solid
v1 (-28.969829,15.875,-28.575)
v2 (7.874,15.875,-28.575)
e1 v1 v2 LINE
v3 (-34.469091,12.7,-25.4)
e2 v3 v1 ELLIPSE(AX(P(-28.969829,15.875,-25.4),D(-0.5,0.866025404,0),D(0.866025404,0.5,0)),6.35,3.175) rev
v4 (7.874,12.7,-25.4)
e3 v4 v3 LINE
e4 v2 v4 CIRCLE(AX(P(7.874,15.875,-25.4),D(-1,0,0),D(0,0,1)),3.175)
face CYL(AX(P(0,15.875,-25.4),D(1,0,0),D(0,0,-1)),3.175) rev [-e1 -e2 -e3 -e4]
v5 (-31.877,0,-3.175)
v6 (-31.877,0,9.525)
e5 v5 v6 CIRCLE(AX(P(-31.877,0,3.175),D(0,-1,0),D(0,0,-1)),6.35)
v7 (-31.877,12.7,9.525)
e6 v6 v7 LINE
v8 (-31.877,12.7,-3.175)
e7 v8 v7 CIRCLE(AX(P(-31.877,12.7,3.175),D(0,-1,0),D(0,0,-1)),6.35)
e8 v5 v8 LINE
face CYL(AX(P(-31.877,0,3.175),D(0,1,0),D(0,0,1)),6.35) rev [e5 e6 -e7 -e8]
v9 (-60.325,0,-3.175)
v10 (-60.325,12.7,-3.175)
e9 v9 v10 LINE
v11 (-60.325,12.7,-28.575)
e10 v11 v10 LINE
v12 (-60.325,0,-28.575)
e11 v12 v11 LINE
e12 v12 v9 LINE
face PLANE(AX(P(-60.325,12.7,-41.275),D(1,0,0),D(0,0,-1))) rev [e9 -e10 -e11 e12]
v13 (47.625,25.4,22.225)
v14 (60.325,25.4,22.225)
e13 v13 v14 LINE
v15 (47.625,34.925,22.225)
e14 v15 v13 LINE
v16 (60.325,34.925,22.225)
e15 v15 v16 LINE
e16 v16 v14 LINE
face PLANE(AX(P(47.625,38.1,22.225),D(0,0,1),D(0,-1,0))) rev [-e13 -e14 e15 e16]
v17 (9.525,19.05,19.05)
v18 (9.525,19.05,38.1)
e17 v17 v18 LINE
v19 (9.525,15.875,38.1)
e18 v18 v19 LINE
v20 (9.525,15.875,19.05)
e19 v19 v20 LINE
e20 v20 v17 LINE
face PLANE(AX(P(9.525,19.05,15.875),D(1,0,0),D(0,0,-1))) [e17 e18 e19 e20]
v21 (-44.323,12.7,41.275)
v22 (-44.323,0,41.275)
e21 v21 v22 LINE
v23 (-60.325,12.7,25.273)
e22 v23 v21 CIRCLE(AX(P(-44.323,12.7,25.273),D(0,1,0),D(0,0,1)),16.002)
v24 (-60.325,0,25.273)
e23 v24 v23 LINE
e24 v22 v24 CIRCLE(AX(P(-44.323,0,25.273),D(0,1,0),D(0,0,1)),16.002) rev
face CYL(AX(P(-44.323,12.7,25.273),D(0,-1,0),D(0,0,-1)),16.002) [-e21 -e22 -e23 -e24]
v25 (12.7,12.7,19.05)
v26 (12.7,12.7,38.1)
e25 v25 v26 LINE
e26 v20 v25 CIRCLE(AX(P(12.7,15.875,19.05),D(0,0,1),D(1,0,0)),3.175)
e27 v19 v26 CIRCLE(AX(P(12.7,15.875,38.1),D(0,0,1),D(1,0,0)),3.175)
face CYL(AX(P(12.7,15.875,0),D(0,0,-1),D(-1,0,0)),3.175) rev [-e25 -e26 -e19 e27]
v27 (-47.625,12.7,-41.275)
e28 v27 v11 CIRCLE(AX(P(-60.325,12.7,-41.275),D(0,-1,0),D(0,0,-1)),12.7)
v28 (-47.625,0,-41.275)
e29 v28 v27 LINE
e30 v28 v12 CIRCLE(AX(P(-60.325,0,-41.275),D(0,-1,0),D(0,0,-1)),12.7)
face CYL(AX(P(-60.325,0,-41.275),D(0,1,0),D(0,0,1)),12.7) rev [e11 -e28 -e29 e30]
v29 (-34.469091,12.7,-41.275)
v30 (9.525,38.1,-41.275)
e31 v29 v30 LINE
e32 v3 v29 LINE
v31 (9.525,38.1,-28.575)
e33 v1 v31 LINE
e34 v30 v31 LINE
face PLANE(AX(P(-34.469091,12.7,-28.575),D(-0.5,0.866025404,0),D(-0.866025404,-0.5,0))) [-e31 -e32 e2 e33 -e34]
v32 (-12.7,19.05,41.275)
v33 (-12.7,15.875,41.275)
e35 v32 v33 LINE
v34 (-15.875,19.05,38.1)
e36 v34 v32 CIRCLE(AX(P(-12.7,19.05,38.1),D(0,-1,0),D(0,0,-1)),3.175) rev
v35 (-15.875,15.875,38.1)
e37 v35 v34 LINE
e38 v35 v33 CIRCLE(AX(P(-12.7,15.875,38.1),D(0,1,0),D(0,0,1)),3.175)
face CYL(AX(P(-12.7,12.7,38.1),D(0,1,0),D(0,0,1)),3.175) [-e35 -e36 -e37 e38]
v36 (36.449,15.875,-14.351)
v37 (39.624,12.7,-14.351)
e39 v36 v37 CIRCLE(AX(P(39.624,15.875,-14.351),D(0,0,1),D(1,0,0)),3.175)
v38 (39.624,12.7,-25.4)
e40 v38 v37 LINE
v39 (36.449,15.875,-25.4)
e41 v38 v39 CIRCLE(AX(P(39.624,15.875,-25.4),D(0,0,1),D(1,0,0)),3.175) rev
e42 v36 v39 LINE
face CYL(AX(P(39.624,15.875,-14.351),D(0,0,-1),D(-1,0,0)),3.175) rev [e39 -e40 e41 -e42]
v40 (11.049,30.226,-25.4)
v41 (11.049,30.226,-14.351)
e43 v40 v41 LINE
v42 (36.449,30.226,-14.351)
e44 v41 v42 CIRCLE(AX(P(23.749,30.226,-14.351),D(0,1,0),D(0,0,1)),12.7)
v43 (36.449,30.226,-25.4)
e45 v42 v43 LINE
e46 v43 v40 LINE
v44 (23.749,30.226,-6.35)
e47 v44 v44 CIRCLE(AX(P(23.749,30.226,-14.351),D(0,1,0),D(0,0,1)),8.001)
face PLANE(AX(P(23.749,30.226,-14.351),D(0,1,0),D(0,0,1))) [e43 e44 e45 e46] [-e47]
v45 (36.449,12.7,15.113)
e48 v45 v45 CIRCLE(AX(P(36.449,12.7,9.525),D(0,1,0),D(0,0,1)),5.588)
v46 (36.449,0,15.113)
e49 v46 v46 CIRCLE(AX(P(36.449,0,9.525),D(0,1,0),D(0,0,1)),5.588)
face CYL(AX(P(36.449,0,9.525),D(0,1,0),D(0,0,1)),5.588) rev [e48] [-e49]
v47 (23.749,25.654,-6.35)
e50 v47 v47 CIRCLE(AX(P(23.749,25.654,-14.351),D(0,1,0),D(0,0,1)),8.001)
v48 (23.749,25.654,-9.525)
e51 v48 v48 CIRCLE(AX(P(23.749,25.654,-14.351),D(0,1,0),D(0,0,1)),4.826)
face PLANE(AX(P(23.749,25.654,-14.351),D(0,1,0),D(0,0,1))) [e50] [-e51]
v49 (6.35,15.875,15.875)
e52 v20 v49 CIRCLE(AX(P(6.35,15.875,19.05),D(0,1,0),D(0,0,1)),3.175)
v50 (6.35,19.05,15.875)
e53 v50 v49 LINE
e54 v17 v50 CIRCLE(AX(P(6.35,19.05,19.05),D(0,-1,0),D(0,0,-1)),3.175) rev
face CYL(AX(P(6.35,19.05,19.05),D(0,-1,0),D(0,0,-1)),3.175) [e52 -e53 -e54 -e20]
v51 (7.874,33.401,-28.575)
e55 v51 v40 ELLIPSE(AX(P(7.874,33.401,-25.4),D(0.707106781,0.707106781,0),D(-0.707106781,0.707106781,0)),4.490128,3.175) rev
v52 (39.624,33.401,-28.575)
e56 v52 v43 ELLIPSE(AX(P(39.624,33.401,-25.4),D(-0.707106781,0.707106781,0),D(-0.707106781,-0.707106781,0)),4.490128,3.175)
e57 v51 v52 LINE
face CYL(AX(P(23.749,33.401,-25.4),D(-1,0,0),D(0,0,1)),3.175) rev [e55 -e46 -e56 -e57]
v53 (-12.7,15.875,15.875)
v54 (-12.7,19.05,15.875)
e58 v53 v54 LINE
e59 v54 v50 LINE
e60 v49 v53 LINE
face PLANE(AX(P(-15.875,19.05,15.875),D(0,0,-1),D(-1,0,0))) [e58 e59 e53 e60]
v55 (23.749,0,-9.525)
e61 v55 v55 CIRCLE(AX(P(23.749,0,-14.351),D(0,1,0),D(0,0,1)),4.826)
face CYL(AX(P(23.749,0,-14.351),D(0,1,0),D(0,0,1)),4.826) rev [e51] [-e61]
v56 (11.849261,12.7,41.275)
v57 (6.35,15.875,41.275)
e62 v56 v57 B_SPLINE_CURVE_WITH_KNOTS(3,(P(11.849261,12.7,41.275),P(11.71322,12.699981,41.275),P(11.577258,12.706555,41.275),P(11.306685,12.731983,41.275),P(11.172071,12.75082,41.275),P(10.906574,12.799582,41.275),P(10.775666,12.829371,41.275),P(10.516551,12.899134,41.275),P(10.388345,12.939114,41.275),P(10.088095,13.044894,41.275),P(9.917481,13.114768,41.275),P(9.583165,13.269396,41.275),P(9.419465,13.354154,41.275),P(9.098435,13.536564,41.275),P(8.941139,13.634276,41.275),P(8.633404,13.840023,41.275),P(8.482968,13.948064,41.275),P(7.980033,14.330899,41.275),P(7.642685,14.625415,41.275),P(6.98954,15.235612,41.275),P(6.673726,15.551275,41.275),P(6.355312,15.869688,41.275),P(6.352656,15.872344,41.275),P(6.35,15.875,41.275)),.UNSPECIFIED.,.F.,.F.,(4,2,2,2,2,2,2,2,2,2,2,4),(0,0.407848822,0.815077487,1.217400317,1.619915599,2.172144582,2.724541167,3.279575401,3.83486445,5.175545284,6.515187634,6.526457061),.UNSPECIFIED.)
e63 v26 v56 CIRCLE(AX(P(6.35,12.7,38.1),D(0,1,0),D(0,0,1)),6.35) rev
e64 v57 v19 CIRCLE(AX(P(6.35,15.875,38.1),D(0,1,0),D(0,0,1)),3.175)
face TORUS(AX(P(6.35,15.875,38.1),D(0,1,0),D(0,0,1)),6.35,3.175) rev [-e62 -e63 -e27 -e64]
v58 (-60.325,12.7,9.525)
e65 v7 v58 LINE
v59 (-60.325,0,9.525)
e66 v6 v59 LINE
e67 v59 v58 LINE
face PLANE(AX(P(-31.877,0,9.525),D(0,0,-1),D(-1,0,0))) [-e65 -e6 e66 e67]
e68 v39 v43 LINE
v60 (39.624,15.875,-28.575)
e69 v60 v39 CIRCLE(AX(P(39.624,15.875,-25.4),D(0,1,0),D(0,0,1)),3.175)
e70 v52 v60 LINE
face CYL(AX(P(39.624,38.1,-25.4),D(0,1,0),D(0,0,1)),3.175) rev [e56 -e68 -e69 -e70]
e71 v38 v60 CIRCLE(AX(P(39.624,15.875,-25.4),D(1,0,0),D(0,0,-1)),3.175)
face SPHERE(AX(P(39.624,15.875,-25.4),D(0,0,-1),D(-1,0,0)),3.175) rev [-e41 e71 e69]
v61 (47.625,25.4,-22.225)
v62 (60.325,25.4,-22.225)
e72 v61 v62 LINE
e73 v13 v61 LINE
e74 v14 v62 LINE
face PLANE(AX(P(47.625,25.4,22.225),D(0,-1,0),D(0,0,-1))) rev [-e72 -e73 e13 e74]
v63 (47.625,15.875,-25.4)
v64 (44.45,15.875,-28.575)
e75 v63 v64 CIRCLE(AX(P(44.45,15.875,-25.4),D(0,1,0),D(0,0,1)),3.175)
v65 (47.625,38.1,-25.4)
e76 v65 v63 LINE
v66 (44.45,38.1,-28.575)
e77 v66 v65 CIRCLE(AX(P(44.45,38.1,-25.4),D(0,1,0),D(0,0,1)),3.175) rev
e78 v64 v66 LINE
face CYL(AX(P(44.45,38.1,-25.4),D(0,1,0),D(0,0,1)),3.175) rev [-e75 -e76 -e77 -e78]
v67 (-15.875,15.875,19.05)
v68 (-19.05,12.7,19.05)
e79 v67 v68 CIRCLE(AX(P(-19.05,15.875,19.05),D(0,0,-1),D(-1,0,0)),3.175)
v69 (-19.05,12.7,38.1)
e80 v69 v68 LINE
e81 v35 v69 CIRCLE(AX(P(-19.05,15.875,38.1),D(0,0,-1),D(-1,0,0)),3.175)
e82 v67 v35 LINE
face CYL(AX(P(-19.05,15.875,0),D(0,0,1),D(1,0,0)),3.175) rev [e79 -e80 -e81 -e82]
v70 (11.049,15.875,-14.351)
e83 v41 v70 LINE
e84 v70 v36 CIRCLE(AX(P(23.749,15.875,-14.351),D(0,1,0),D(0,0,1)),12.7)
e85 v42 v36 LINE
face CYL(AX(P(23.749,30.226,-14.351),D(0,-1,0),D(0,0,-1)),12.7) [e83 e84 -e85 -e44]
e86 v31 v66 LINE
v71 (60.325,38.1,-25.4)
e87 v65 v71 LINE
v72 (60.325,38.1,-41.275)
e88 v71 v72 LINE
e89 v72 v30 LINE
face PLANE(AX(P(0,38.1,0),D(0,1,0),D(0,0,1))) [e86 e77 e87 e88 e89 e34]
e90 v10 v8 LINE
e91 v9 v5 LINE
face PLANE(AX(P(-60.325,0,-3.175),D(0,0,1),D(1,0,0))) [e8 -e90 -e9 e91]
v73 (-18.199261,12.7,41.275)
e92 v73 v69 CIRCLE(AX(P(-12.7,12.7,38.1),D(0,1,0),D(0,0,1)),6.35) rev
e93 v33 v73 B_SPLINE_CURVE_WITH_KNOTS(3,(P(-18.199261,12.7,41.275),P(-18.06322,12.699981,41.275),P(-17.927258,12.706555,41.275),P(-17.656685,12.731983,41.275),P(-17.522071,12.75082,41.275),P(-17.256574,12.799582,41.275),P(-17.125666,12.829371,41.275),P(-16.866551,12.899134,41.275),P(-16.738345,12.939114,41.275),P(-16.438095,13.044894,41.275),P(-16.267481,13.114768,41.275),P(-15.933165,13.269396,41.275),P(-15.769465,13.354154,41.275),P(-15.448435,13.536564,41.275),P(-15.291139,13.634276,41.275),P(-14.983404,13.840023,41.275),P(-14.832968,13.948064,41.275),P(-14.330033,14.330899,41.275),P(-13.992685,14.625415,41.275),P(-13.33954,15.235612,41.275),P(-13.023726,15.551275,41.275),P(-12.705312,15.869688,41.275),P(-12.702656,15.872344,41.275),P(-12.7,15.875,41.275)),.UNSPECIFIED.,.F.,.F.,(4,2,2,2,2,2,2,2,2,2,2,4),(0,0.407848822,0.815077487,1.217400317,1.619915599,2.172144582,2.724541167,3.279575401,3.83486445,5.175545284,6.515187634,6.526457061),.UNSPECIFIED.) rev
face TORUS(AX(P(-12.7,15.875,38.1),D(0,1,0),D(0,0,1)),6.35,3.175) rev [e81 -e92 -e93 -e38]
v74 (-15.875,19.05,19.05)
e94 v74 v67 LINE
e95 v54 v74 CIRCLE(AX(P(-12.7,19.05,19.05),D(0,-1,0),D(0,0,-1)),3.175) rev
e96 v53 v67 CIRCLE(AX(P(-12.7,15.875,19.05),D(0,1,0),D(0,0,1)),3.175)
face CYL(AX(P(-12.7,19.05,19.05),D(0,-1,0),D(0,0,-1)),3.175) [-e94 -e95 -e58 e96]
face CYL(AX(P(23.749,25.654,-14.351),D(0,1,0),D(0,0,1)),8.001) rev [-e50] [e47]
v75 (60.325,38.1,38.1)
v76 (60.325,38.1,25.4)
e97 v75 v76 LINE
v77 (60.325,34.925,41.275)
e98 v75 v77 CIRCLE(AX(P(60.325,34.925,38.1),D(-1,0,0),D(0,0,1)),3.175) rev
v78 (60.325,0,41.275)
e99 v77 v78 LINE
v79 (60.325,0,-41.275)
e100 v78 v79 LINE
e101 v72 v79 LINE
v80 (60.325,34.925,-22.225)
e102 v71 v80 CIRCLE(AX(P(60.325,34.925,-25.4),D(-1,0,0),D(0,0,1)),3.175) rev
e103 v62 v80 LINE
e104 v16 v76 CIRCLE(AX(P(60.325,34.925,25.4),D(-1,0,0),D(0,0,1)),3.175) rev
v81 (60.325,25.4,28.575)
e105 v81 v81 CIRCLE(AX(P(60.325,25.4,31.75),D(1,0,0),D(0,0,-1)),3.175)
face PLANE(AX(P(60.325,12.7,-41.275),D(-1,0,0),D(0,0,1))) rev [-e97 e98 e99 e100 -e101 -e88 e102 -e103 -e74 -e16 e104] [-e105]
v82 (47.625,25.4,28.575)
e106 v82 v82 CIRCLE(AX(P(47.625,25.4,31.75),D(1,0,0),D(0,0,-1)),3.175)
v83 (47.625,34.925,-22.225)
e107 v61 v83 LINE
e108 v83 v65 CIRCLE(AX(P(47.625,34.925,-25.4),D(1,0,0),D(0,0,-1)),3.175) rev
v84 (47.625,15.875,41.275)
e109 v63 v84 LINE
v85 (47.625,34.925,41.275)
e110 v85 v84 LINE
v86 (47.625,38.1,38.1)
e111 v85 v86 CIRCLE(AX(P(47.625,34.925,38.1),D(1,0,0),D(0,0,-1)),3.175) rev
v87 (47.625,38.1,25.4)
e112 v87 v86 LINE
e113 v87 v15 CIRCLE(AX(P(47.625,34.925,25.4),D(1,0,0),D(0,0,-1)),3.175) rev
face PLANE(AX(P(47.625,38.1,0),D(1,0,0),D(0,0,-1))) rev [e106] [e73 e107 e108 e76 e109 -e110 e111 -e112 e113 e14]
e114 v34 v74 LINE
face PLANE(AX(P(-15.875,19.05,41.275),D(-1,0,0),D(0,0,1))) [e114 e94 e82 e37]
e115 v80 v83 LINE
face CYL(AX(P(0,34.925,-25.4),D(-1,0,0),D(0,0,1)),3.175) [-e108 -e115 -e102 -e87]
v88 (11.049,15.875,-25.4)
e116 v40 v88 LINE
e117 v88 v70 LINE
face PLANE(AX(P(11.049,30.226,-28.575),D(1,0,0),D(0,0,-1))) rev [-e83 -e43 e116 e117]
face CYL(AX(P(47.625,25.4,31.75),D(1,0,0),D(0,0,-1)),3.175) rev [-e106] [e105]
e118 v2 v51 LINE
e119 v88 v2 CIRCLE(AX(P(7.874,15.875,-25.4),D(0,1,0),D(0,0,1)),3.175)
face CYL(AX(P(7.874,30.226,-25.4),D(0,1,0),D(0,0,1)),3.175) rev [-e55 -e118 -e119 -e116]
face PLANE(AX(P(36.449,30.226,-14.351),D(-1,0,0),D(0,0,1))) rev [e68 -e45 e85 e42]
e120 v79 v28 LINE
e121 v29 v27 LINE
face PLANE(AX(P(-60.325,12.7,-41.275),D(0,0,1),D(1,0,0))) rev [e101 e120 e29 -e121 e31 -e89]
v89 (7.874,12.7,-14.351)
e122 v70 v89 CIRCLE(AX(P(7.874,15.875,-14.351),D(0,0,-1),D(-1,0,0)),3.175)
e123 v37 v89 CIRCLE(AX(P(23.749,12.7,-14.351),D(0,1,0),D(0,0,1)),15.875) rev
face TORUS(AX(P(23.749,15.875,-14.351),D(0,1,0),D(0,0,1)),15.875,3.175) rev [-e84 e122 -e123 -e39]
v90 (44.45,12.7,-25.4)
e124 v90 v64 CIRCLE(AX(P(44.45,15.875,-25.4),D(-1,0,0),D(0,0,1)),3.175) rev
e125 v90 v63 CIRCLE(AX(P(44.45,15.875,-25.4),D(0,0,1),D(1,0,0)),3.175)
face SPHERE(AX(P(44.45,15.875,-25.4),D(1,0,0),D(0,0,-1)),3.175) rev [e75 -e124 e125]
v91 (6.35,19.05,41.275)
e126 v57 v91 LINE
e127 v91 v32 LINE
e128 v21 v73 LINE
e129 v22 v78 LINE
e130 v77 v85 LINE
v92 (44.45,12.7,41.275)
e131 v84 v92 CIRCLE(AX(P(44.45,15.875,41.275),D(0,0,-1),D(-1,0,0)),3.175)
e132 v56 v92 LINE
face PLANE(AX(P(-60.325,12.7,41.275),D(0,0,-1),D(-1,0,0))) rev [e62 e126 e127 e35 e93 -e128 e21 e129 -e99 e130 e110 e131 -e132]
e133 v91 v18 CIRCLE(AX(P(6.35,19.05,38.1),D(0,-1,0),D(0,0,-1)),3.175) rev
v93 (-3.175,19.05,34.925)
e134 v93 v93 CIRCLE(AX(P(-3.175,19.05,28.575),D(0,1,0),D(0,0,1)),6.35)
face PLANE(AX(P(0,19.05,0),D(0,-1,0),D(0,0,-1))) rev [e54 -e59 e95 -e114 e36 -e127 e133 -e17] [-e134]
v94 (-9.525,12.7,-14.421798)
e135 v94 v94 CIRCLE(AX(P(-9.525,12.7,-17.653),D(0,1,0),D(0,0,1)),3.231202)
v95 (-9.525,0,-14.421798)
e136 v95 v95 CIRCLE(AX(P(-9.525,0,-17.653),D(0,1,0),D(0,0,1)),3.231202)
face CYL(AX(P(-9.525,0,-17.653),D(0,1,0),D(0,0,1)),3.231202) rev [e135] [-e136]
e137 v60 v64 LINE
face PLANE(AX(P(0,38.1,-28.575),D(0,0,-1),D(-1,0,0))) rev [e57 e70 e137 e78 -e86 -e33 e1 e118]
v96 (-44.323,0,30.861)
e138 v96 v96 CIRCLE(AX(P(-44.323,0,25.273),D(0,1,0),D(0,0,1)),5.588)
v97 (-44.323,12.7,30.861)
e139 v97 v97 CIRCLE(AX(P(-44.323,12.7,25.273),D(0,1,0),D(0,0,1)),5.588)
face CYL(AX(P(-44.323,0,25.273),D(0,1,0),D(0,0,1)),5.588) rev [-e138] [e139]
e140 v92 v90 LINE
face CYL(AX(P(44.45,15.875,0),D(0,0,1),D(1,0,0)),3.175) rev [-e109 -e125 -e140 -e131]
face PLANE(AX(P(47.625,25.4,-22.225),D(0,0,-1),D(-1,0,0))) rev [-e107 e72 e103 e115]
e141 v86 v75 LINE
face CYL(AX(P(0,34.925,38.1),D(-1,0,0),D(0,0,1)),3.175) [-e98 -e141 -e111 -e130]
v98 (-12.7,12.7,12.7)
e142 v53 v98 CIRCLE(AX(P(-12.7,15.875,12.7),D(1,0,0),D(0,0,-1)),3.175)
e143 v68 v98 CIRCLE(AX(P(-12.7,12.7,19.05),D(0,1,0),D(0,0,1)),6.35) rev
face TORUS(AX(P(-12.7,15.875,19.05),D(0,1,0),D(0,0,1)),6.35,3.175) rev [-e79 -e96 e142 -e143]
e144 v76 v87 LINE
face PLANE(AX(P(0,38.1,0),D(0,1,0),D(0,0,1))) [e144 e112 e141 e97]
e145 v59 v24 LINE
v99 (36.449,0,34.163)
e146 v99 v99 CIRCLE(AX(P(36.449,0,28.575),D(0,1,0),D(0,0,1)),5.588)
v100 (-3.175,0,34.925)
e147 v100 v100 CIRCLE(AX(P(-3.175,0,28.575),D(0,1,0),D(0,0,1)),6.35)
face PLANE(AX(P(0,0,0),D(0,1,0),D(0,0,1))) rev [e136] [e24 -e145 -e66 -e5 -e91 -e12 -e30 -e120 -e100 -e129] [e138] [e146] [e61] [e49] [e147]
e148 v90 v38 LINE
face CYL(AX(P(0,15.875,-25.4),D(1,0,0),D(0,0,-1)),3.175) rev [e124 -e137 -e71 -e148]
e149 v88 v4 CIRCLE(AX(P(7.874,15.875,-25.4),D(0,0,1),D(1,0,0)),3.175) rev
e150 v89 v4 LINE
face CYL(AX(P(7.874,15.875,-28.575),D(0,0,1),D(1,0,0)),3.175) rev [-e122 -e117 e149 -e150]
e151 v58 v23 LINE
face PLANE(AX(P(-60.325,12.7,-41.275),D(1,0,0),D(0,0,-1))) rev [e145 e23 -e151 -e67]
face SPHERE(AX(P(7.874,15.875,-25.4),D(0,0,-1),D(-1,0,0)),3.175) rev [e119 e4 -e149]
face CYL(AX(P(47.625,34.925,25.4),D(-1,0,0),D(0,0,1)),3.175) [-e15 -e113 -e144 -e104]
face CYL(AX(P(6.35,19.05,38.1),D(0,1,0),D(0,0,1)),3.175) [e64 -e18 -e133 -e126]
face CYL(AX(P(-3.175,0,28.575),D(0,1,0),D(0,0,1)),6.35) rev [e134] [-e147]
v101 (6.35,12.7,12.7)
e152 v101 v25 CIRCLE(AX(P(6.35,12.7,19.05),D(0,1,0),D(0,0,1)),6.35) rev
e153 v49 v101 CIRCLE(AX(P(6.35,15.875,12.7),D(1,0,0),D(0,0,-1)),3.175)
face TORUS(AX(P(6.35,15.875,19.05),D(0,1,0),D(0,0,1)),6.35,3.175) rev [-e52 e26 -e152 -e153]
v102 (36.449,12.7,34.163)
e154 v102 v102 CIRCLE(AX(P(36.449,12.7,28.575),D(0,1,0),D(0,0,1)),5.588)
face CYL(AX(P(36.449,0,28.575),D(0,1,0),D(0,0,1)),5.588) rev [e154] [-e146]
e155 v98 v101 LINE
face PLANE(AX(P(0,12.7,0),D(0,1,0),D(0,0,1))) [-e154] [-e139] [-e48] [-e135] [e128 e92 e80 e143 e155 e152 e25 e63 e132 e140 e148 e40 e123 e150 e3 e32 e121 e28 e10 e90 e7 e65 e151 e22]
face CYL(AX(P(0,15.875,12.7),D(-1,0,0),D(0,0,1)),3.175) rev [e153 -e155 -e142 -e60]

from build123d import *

# Parameters (mm, degrees)
SKETCH1_W           = 120.65
SKETCH1_H           = 82.55
BOSS_EXTRUDE1_DEPTH = 12.7
FILLET1_R           = 16.002
SKETCH2_R           = 5.588
SKETCH2_R_2         = 3.231202494
SKETCH2_R_3         = 6.35
CUT_EXTRUDE1_DEPTH  = 12.7
BOSS_EXTRUDE2_START = 6.35
SKETCH2_5_W         = 25.4
SKETCH2_5_H         = 25.4
SKETCH2_5_R         = 6.35
BOSS_EXTRUDE2_DEPTH = 6.35
BOSS_EXTRUDE3_DEPTH = 25.4
BOSS_EXTRUDE4_DEPTH = 17.526
BOSS_EXTRUDE5_DEPTH = 12.7
FILLET2_R           = 3.175
FILLET3_R           = 3.175
FILLET4_R           = 3.175
SKETCH5_R           = 8.001
CUT_EXTRUDE2_DEPTH  = 4.572
SKETCH6_R           = 4.826
CUT_EXTRUDE3_DEPTH  = 25.654
SKETCH7_W           = 44.45
SKETCH7_H           = 12.7
CUT_EXTRUDE4_DEPTH  = 12.7
FILLET5_R           = 3.175
FILLET6_R           = 3.175
SKETCH8_R           = 3.175
CUT_EXTRUDE5_DEPTH  = 12.7


with BuildPart() as part:
    # Sketch1 → Boss-Extrude1 (new body)
    with BuildSketch(Plane(origin=(0, 0, 0), x_dir=(1, 0, 0), z_dir=(0, 1, 0))):
        Rectangle(SKETCH1_W, SKETCH1_H)
    extrude(amount=BOSS_EXTRUDE1_DEPTH)

    # Fillet1
    fillet1_edges = [part.edges().sort_by_distance(p)[0] for p in [
        (-60.325, 6.35, 41.275),
    ]]
    fillet(fillet1_edges, radius=FILLET1_R)

    # Sketch2 → Cut-Extrude1 (cut)
    with BuildSketch(Plane(origin=(0, 12.7, 0), x_dir=(1, 0, 0), z_dir=(0, 1, 0))):
        with Locations(Location((36.449, -9.525, 0), (0, 0, 270))):
            Circle(SKETCH2_R)
        with Locations(Location((36.449, -28.575, 0), (0, 0, 270))):
            Circle(SKETCH2_R)
        with Locations(Location((-9.525, 17.653, 0), (0, 0, 270))):
            Circle(SKETCH2_R_2)
        with Locations(Location((-44.323, -25.273, 0), (0, 0, 270))):
            Circle(SKETCH2_R)
        with Locations(Location((-3.175, -28.575, 0), (0, 0, 270))):
            Circle(SKETCH2_R_3)
        with BuildLine():
            Line((-47.625, 41.275), (-60.325, 41.275))
            Line((-60.325, 41.275), (-60.325, 28.575))
            ThreePointArc((-60.325, 28.575), (-51.344743879, 32.294743879), (-47.625, 41.275))
        make_face()
        with BuildLine():
            Line((-60.325, 3.175), (-31.877, 3.175))
            ThreePointArc((-31.877, 3.175), (-25.527, -3.175), (-31.877, -9.525))
            Line((-31.877, -9.525), (-60.325, -9.525))
            Line((-60.325, -9.525), (-60.325, 3.175))
        make_face()
    extrude(amount=-CUT_EXTRUDE1_DEPTH, mode=Mode.SUBTRACT)

    # Sketch2<5> → Boss-Extrude2 (add)
    with BuildSketch(Plane(origin=(0, 12.7, 0), x_dir=(1, 0, 0), z_dir=(0, 1, 0)).offset(BOSS_EXTRUDE2_START)):
        with Locations((-3.175, -28.575)):
            Rectangle(SKETCH2_5_W, SKETCH2_5_H)
        with Locations(Location((-3.175, -28.575, 0), (0, 0, 270))):
            Circle(SKETCH2_5_R, mode=Mode.SUBTRACT)
    extrude(amount=-BOSS_EXTRUDE2_DEPTH)

    # Sketch2<6> → Boss-Extrude3 (add)
    with BuildSketch(Plane(origin=(0, 12.7, 0), x_dir=(1, 0, 0), z_dir=(0, 1, 0))):
        Polygon((60.325, -41.275), (60.325, 41.275), (9.525, 41.275), (9.525, 28.575), (47.625, 28.575), (47.625, -41.275), align=None)
    extrude(amount=BOSS_EXTRUDE3_DEPTH)

    # Sketch2<10> → Boss-Extrude4 (add)
    with BuildSketch(Plane(origin=(0, 12.7, 0), x_dir=(1, 0, 0), z_dir=(0, 1, 0))):
        with BuildLine():
            Line((11.049, 28.575), (11.049, 14.351))
            ThreePointArc((11.049, 14.351), (23.749, 1.651), (36.449, 14.351))
            Line((36.449, 14.351), (36.449, 28.575))
            Line((36.449, 28.575), (11.049, 28.575))
        make_face()
    extrude(amount=BOSS_EXTRUDE4_DEPTH)

    # Sketch4 → Boss-Extrude5 (add)
    with BuildSketch(Plane(origin=(0, 0, -41.275), x_dir=(-1, 0, 0), z_dir=(0, 0, -1))):
        Polygon((-9.525, 38.1), (-9.525, 12.7), (34.469090512, 12.7), align=None)
    extrude(amount=-BOSS_EXTRUDE5_DEPTH)

    # Fillet2
    fillet2_edges = [part.edges().sort_by_distance(p)[0] for p in [
        (42.037, 12.7, -28.575),
        (36.449, 21.463, -28.575),
        (11.049, 12.7, -21.463),
        (11.049, 21.463, -28.575),
        (23.749, 12.7, -1.651),
        (36.449, 12.7, -21.463),
        (23.749, 30.226, -28.575),
        (-11.710045256, 12.7, -28.575),
        (47.625, 12.7, 6.35),
        (47.625, 25.4, -28.575),
    ]]
    fillet(fillet2_edges, radius=FILLET2_R)

    # Fillet3
    fillet3_edges = [part.edges().sort_by_distance(p)[0] for p in [
        (9.525, 15.875, 15.875),
        (-15.875, 15.875, 15.875),
        (-15.875, 15.875, 41.275),
        (9.525, 15.875, 41.275),
    ]]
    fillet(fillet3_edges, radius=FILLET3_R)

    # Fillet4
    # the kernel refuses this fillet: 3.175 mm, written as the material it adds along each edge
    with BuildSketch(Plane(origin=(9.525, 12.7, 19.05), x_dir=(0, 1, 0), z_dir=(0, 0, 1)), Plane(origin=(-12.7, 12.7, 15.875), x_dir=(0, 1, 0), z_dir=(1, 0, 0)), Plane(origin=(-15.875, 12.7, 38.1), x_dir=(0, 1, 0), z_dir=(0, 0, -1))) as fillet4_piece_1:
        with BuildLine():
            CenterArc((FILLET4_R, -FILLET4_R), FILLET4_R, 90, 90)
            Line((0, -FILLET4_R), (0, 0))
            Line((0, 0), (FILLET4_R, 0))
        make_face()
    extrude(amount=19.05)
    with BuildSketch(Plane(origin=(6.35, 12.7, 38.1), x_dir=(-0.5976672776328281, 0, -0.8017442392976478), z_dir=(0.8017442392976478, 0, -0.5976672776328281))) as fillet4_piece_2_section:
        with BuildLine():
            CenterArc((3.175 + FILLET4_R, FILLET4_R), FILLET4_R, 180, 90)
            Line((3.175 + FILLET4_R, 0), (3.175, 0))
            Line((3.175, 0), (3.175, FILLET4_R))
        make_face()
    fillet4_piece_2 = revolve(axis=Axis((6.35, 12.7, 38.1), (0, 1, 0)), revolution_arc=233.296989237, mode=Mode.PRIVATE)
    fillet4_piece_2 = split(fillet4_piece_2, bisect_by=Plane(origin=(8.731056041, 13.689420087, 41.275), z_dir=(0, 0, -1)), keep=Keep.TOP, mode=Mode.PRIVATE)
    add(fillet4_piece_2)
    with BuildSketch(Plane(origin=(6.35, 12.7, 19.05), x_dir=(0, 0, -1), z_dir=(-1, 0, 0))) as fillet4_piece_3:
        with BuildLine():
            CenterArc((3.175 + FILLET4_R, -FILLET4_R), FILLET4_R, 90, 90)
            Line((3.175 + FILLET4_R, 0), (3.175, 0))
            Line((3.175, 0), (3.175, -FILLET4_R))
        make_face()
    revolve(axis=Axis((6.35, 12.7, 19.05), (0, -1, 0)), revolution_arc=90)
    with BuildSketch(Plane(origin=(-12.7, 12.7, 19.05), x_dir=(-1, 0, 0), z_dir=(0, 0, 1))) as fillet4_piece_4:
        with BuildLine():
            CenterArc((3.175 + FILLET4_R, -FILLET4_R), FILLET4_R, 90, 90)
            Line((3.175 + FILLET4_R, 0), (3.175, 0))
            Line((3.175, 0), (3.175, -FILLET4_R))
        make_face()
    revolve(axis=Axis((-12.7, 12.7, 19.05), (0, -1, 0)), revolution_arc=90)
    with BuildSketch(Plane(origin=(-12.7, 12.7, 38.1), x_dir=(0.5976672776328279, 0, -0.8017442392976479), z_dir=(-0.8017442392976479, 0, -0.5976672776328279))) as fillet4_piece_5_section:
        with BuildLine():
            CenterArc((3.175 + FILLET4_R, -FILLET4_R), FILLET4_R, 90, 90)
            Line((3.175, -FILLET4_R), (3.175, 0))
            Line((3.175, 0), (3.175 + FILLET4_R, 0))
        make_face()
    fillet4_piece_5 = revolve(axis=Axis((-12.7, 12.7, 38.1), (0, -1, 0)), revolution_arc=233.296989237, mode=Mode.PRIVATE)
    fillet4_piece_5 = split(fillet4_piece_5, bisect_by=Plane(origin=(-15.081056252, 13.689419911, 41.275), z_dir=(0, 0, -1)), keep=Keep.TOP, mode=Mode.PRIVATE)
    add(fillet4_piece_5)

    # Sketch5 → Cut-Extrude2 (cut)
    with BuildSketch(Plane(origin=(0, 30.226, 0), x_dir=(1, 0, 0), z_dir=(0, 1, 0))):
        with Locations(Location((23.749, 14.351, 0), (0, 0, 270))):
            Circle(SKETCH5_R)
    extrude(amount=-CUT_EXTRUDE2_DEPTH, mode=Mode.SUBTRACT)

    # Sketch6 → Cut-Extrude3 (cut)
    with BuildSketch(Plane(origin=(0, 25.654, 0), x_dir=(1, 0, 0), z_dir=(0, 1, 0))):
        with Locations(Location((23.749, 14.351, 0), (0, 0, 270))):
            Circle(SKETCH6_R)
    extrude(amount=-CUT_EXTRUDE3_DEPTH, mode=Mode.SUBTRACT)

    # Sketch7 → Cut-Extrude4 (cut)
    with BuildSketch(Plane(origin=(60.325, 0, 0), x_dir=(0, 0, -1), z_dir=(1, 0, 0))):
        with Locations((0, 31.75)):
            Rectangle(SKETCH7_W, SKETCH7_H)
    extrude(amount=-CUT_EXTRUDE4_DEPTH, mode=Mode.SUBTRACT)

    # Fillet5
    fillet5_edges = [part.edges().sort_by_distance(p)[0] for p in [
        (53.975, 38.1, -22.225),
    ]]
    fillet(fillet5_edges, radius=FILLET5_R)

    # Fillet6
    fillet6_edges = [part.edges().sort_by_distance(p)[0] for p in [
        (53.975, 38.1, 22.225),
        (53.975, 38.1, 41.275),
    ]]
    fillet(fillet6_edges, radius=FILLET6_R)

    # Sketch8 → Cut-Extrude5 (cut)
    with BuildSketch(Plane(origin=(60.325, 0, 0), x_dir=(0, 0, -1), z_dir=(1, 0, 0))):
        with Locations((-31.75, 25.4)):
            Circle(SKETCH8_R)
    extrude(amount=-CUT_EXTRUDE5_DEPTH, mode=Mode.SUBTRACT)


solid = part.part
